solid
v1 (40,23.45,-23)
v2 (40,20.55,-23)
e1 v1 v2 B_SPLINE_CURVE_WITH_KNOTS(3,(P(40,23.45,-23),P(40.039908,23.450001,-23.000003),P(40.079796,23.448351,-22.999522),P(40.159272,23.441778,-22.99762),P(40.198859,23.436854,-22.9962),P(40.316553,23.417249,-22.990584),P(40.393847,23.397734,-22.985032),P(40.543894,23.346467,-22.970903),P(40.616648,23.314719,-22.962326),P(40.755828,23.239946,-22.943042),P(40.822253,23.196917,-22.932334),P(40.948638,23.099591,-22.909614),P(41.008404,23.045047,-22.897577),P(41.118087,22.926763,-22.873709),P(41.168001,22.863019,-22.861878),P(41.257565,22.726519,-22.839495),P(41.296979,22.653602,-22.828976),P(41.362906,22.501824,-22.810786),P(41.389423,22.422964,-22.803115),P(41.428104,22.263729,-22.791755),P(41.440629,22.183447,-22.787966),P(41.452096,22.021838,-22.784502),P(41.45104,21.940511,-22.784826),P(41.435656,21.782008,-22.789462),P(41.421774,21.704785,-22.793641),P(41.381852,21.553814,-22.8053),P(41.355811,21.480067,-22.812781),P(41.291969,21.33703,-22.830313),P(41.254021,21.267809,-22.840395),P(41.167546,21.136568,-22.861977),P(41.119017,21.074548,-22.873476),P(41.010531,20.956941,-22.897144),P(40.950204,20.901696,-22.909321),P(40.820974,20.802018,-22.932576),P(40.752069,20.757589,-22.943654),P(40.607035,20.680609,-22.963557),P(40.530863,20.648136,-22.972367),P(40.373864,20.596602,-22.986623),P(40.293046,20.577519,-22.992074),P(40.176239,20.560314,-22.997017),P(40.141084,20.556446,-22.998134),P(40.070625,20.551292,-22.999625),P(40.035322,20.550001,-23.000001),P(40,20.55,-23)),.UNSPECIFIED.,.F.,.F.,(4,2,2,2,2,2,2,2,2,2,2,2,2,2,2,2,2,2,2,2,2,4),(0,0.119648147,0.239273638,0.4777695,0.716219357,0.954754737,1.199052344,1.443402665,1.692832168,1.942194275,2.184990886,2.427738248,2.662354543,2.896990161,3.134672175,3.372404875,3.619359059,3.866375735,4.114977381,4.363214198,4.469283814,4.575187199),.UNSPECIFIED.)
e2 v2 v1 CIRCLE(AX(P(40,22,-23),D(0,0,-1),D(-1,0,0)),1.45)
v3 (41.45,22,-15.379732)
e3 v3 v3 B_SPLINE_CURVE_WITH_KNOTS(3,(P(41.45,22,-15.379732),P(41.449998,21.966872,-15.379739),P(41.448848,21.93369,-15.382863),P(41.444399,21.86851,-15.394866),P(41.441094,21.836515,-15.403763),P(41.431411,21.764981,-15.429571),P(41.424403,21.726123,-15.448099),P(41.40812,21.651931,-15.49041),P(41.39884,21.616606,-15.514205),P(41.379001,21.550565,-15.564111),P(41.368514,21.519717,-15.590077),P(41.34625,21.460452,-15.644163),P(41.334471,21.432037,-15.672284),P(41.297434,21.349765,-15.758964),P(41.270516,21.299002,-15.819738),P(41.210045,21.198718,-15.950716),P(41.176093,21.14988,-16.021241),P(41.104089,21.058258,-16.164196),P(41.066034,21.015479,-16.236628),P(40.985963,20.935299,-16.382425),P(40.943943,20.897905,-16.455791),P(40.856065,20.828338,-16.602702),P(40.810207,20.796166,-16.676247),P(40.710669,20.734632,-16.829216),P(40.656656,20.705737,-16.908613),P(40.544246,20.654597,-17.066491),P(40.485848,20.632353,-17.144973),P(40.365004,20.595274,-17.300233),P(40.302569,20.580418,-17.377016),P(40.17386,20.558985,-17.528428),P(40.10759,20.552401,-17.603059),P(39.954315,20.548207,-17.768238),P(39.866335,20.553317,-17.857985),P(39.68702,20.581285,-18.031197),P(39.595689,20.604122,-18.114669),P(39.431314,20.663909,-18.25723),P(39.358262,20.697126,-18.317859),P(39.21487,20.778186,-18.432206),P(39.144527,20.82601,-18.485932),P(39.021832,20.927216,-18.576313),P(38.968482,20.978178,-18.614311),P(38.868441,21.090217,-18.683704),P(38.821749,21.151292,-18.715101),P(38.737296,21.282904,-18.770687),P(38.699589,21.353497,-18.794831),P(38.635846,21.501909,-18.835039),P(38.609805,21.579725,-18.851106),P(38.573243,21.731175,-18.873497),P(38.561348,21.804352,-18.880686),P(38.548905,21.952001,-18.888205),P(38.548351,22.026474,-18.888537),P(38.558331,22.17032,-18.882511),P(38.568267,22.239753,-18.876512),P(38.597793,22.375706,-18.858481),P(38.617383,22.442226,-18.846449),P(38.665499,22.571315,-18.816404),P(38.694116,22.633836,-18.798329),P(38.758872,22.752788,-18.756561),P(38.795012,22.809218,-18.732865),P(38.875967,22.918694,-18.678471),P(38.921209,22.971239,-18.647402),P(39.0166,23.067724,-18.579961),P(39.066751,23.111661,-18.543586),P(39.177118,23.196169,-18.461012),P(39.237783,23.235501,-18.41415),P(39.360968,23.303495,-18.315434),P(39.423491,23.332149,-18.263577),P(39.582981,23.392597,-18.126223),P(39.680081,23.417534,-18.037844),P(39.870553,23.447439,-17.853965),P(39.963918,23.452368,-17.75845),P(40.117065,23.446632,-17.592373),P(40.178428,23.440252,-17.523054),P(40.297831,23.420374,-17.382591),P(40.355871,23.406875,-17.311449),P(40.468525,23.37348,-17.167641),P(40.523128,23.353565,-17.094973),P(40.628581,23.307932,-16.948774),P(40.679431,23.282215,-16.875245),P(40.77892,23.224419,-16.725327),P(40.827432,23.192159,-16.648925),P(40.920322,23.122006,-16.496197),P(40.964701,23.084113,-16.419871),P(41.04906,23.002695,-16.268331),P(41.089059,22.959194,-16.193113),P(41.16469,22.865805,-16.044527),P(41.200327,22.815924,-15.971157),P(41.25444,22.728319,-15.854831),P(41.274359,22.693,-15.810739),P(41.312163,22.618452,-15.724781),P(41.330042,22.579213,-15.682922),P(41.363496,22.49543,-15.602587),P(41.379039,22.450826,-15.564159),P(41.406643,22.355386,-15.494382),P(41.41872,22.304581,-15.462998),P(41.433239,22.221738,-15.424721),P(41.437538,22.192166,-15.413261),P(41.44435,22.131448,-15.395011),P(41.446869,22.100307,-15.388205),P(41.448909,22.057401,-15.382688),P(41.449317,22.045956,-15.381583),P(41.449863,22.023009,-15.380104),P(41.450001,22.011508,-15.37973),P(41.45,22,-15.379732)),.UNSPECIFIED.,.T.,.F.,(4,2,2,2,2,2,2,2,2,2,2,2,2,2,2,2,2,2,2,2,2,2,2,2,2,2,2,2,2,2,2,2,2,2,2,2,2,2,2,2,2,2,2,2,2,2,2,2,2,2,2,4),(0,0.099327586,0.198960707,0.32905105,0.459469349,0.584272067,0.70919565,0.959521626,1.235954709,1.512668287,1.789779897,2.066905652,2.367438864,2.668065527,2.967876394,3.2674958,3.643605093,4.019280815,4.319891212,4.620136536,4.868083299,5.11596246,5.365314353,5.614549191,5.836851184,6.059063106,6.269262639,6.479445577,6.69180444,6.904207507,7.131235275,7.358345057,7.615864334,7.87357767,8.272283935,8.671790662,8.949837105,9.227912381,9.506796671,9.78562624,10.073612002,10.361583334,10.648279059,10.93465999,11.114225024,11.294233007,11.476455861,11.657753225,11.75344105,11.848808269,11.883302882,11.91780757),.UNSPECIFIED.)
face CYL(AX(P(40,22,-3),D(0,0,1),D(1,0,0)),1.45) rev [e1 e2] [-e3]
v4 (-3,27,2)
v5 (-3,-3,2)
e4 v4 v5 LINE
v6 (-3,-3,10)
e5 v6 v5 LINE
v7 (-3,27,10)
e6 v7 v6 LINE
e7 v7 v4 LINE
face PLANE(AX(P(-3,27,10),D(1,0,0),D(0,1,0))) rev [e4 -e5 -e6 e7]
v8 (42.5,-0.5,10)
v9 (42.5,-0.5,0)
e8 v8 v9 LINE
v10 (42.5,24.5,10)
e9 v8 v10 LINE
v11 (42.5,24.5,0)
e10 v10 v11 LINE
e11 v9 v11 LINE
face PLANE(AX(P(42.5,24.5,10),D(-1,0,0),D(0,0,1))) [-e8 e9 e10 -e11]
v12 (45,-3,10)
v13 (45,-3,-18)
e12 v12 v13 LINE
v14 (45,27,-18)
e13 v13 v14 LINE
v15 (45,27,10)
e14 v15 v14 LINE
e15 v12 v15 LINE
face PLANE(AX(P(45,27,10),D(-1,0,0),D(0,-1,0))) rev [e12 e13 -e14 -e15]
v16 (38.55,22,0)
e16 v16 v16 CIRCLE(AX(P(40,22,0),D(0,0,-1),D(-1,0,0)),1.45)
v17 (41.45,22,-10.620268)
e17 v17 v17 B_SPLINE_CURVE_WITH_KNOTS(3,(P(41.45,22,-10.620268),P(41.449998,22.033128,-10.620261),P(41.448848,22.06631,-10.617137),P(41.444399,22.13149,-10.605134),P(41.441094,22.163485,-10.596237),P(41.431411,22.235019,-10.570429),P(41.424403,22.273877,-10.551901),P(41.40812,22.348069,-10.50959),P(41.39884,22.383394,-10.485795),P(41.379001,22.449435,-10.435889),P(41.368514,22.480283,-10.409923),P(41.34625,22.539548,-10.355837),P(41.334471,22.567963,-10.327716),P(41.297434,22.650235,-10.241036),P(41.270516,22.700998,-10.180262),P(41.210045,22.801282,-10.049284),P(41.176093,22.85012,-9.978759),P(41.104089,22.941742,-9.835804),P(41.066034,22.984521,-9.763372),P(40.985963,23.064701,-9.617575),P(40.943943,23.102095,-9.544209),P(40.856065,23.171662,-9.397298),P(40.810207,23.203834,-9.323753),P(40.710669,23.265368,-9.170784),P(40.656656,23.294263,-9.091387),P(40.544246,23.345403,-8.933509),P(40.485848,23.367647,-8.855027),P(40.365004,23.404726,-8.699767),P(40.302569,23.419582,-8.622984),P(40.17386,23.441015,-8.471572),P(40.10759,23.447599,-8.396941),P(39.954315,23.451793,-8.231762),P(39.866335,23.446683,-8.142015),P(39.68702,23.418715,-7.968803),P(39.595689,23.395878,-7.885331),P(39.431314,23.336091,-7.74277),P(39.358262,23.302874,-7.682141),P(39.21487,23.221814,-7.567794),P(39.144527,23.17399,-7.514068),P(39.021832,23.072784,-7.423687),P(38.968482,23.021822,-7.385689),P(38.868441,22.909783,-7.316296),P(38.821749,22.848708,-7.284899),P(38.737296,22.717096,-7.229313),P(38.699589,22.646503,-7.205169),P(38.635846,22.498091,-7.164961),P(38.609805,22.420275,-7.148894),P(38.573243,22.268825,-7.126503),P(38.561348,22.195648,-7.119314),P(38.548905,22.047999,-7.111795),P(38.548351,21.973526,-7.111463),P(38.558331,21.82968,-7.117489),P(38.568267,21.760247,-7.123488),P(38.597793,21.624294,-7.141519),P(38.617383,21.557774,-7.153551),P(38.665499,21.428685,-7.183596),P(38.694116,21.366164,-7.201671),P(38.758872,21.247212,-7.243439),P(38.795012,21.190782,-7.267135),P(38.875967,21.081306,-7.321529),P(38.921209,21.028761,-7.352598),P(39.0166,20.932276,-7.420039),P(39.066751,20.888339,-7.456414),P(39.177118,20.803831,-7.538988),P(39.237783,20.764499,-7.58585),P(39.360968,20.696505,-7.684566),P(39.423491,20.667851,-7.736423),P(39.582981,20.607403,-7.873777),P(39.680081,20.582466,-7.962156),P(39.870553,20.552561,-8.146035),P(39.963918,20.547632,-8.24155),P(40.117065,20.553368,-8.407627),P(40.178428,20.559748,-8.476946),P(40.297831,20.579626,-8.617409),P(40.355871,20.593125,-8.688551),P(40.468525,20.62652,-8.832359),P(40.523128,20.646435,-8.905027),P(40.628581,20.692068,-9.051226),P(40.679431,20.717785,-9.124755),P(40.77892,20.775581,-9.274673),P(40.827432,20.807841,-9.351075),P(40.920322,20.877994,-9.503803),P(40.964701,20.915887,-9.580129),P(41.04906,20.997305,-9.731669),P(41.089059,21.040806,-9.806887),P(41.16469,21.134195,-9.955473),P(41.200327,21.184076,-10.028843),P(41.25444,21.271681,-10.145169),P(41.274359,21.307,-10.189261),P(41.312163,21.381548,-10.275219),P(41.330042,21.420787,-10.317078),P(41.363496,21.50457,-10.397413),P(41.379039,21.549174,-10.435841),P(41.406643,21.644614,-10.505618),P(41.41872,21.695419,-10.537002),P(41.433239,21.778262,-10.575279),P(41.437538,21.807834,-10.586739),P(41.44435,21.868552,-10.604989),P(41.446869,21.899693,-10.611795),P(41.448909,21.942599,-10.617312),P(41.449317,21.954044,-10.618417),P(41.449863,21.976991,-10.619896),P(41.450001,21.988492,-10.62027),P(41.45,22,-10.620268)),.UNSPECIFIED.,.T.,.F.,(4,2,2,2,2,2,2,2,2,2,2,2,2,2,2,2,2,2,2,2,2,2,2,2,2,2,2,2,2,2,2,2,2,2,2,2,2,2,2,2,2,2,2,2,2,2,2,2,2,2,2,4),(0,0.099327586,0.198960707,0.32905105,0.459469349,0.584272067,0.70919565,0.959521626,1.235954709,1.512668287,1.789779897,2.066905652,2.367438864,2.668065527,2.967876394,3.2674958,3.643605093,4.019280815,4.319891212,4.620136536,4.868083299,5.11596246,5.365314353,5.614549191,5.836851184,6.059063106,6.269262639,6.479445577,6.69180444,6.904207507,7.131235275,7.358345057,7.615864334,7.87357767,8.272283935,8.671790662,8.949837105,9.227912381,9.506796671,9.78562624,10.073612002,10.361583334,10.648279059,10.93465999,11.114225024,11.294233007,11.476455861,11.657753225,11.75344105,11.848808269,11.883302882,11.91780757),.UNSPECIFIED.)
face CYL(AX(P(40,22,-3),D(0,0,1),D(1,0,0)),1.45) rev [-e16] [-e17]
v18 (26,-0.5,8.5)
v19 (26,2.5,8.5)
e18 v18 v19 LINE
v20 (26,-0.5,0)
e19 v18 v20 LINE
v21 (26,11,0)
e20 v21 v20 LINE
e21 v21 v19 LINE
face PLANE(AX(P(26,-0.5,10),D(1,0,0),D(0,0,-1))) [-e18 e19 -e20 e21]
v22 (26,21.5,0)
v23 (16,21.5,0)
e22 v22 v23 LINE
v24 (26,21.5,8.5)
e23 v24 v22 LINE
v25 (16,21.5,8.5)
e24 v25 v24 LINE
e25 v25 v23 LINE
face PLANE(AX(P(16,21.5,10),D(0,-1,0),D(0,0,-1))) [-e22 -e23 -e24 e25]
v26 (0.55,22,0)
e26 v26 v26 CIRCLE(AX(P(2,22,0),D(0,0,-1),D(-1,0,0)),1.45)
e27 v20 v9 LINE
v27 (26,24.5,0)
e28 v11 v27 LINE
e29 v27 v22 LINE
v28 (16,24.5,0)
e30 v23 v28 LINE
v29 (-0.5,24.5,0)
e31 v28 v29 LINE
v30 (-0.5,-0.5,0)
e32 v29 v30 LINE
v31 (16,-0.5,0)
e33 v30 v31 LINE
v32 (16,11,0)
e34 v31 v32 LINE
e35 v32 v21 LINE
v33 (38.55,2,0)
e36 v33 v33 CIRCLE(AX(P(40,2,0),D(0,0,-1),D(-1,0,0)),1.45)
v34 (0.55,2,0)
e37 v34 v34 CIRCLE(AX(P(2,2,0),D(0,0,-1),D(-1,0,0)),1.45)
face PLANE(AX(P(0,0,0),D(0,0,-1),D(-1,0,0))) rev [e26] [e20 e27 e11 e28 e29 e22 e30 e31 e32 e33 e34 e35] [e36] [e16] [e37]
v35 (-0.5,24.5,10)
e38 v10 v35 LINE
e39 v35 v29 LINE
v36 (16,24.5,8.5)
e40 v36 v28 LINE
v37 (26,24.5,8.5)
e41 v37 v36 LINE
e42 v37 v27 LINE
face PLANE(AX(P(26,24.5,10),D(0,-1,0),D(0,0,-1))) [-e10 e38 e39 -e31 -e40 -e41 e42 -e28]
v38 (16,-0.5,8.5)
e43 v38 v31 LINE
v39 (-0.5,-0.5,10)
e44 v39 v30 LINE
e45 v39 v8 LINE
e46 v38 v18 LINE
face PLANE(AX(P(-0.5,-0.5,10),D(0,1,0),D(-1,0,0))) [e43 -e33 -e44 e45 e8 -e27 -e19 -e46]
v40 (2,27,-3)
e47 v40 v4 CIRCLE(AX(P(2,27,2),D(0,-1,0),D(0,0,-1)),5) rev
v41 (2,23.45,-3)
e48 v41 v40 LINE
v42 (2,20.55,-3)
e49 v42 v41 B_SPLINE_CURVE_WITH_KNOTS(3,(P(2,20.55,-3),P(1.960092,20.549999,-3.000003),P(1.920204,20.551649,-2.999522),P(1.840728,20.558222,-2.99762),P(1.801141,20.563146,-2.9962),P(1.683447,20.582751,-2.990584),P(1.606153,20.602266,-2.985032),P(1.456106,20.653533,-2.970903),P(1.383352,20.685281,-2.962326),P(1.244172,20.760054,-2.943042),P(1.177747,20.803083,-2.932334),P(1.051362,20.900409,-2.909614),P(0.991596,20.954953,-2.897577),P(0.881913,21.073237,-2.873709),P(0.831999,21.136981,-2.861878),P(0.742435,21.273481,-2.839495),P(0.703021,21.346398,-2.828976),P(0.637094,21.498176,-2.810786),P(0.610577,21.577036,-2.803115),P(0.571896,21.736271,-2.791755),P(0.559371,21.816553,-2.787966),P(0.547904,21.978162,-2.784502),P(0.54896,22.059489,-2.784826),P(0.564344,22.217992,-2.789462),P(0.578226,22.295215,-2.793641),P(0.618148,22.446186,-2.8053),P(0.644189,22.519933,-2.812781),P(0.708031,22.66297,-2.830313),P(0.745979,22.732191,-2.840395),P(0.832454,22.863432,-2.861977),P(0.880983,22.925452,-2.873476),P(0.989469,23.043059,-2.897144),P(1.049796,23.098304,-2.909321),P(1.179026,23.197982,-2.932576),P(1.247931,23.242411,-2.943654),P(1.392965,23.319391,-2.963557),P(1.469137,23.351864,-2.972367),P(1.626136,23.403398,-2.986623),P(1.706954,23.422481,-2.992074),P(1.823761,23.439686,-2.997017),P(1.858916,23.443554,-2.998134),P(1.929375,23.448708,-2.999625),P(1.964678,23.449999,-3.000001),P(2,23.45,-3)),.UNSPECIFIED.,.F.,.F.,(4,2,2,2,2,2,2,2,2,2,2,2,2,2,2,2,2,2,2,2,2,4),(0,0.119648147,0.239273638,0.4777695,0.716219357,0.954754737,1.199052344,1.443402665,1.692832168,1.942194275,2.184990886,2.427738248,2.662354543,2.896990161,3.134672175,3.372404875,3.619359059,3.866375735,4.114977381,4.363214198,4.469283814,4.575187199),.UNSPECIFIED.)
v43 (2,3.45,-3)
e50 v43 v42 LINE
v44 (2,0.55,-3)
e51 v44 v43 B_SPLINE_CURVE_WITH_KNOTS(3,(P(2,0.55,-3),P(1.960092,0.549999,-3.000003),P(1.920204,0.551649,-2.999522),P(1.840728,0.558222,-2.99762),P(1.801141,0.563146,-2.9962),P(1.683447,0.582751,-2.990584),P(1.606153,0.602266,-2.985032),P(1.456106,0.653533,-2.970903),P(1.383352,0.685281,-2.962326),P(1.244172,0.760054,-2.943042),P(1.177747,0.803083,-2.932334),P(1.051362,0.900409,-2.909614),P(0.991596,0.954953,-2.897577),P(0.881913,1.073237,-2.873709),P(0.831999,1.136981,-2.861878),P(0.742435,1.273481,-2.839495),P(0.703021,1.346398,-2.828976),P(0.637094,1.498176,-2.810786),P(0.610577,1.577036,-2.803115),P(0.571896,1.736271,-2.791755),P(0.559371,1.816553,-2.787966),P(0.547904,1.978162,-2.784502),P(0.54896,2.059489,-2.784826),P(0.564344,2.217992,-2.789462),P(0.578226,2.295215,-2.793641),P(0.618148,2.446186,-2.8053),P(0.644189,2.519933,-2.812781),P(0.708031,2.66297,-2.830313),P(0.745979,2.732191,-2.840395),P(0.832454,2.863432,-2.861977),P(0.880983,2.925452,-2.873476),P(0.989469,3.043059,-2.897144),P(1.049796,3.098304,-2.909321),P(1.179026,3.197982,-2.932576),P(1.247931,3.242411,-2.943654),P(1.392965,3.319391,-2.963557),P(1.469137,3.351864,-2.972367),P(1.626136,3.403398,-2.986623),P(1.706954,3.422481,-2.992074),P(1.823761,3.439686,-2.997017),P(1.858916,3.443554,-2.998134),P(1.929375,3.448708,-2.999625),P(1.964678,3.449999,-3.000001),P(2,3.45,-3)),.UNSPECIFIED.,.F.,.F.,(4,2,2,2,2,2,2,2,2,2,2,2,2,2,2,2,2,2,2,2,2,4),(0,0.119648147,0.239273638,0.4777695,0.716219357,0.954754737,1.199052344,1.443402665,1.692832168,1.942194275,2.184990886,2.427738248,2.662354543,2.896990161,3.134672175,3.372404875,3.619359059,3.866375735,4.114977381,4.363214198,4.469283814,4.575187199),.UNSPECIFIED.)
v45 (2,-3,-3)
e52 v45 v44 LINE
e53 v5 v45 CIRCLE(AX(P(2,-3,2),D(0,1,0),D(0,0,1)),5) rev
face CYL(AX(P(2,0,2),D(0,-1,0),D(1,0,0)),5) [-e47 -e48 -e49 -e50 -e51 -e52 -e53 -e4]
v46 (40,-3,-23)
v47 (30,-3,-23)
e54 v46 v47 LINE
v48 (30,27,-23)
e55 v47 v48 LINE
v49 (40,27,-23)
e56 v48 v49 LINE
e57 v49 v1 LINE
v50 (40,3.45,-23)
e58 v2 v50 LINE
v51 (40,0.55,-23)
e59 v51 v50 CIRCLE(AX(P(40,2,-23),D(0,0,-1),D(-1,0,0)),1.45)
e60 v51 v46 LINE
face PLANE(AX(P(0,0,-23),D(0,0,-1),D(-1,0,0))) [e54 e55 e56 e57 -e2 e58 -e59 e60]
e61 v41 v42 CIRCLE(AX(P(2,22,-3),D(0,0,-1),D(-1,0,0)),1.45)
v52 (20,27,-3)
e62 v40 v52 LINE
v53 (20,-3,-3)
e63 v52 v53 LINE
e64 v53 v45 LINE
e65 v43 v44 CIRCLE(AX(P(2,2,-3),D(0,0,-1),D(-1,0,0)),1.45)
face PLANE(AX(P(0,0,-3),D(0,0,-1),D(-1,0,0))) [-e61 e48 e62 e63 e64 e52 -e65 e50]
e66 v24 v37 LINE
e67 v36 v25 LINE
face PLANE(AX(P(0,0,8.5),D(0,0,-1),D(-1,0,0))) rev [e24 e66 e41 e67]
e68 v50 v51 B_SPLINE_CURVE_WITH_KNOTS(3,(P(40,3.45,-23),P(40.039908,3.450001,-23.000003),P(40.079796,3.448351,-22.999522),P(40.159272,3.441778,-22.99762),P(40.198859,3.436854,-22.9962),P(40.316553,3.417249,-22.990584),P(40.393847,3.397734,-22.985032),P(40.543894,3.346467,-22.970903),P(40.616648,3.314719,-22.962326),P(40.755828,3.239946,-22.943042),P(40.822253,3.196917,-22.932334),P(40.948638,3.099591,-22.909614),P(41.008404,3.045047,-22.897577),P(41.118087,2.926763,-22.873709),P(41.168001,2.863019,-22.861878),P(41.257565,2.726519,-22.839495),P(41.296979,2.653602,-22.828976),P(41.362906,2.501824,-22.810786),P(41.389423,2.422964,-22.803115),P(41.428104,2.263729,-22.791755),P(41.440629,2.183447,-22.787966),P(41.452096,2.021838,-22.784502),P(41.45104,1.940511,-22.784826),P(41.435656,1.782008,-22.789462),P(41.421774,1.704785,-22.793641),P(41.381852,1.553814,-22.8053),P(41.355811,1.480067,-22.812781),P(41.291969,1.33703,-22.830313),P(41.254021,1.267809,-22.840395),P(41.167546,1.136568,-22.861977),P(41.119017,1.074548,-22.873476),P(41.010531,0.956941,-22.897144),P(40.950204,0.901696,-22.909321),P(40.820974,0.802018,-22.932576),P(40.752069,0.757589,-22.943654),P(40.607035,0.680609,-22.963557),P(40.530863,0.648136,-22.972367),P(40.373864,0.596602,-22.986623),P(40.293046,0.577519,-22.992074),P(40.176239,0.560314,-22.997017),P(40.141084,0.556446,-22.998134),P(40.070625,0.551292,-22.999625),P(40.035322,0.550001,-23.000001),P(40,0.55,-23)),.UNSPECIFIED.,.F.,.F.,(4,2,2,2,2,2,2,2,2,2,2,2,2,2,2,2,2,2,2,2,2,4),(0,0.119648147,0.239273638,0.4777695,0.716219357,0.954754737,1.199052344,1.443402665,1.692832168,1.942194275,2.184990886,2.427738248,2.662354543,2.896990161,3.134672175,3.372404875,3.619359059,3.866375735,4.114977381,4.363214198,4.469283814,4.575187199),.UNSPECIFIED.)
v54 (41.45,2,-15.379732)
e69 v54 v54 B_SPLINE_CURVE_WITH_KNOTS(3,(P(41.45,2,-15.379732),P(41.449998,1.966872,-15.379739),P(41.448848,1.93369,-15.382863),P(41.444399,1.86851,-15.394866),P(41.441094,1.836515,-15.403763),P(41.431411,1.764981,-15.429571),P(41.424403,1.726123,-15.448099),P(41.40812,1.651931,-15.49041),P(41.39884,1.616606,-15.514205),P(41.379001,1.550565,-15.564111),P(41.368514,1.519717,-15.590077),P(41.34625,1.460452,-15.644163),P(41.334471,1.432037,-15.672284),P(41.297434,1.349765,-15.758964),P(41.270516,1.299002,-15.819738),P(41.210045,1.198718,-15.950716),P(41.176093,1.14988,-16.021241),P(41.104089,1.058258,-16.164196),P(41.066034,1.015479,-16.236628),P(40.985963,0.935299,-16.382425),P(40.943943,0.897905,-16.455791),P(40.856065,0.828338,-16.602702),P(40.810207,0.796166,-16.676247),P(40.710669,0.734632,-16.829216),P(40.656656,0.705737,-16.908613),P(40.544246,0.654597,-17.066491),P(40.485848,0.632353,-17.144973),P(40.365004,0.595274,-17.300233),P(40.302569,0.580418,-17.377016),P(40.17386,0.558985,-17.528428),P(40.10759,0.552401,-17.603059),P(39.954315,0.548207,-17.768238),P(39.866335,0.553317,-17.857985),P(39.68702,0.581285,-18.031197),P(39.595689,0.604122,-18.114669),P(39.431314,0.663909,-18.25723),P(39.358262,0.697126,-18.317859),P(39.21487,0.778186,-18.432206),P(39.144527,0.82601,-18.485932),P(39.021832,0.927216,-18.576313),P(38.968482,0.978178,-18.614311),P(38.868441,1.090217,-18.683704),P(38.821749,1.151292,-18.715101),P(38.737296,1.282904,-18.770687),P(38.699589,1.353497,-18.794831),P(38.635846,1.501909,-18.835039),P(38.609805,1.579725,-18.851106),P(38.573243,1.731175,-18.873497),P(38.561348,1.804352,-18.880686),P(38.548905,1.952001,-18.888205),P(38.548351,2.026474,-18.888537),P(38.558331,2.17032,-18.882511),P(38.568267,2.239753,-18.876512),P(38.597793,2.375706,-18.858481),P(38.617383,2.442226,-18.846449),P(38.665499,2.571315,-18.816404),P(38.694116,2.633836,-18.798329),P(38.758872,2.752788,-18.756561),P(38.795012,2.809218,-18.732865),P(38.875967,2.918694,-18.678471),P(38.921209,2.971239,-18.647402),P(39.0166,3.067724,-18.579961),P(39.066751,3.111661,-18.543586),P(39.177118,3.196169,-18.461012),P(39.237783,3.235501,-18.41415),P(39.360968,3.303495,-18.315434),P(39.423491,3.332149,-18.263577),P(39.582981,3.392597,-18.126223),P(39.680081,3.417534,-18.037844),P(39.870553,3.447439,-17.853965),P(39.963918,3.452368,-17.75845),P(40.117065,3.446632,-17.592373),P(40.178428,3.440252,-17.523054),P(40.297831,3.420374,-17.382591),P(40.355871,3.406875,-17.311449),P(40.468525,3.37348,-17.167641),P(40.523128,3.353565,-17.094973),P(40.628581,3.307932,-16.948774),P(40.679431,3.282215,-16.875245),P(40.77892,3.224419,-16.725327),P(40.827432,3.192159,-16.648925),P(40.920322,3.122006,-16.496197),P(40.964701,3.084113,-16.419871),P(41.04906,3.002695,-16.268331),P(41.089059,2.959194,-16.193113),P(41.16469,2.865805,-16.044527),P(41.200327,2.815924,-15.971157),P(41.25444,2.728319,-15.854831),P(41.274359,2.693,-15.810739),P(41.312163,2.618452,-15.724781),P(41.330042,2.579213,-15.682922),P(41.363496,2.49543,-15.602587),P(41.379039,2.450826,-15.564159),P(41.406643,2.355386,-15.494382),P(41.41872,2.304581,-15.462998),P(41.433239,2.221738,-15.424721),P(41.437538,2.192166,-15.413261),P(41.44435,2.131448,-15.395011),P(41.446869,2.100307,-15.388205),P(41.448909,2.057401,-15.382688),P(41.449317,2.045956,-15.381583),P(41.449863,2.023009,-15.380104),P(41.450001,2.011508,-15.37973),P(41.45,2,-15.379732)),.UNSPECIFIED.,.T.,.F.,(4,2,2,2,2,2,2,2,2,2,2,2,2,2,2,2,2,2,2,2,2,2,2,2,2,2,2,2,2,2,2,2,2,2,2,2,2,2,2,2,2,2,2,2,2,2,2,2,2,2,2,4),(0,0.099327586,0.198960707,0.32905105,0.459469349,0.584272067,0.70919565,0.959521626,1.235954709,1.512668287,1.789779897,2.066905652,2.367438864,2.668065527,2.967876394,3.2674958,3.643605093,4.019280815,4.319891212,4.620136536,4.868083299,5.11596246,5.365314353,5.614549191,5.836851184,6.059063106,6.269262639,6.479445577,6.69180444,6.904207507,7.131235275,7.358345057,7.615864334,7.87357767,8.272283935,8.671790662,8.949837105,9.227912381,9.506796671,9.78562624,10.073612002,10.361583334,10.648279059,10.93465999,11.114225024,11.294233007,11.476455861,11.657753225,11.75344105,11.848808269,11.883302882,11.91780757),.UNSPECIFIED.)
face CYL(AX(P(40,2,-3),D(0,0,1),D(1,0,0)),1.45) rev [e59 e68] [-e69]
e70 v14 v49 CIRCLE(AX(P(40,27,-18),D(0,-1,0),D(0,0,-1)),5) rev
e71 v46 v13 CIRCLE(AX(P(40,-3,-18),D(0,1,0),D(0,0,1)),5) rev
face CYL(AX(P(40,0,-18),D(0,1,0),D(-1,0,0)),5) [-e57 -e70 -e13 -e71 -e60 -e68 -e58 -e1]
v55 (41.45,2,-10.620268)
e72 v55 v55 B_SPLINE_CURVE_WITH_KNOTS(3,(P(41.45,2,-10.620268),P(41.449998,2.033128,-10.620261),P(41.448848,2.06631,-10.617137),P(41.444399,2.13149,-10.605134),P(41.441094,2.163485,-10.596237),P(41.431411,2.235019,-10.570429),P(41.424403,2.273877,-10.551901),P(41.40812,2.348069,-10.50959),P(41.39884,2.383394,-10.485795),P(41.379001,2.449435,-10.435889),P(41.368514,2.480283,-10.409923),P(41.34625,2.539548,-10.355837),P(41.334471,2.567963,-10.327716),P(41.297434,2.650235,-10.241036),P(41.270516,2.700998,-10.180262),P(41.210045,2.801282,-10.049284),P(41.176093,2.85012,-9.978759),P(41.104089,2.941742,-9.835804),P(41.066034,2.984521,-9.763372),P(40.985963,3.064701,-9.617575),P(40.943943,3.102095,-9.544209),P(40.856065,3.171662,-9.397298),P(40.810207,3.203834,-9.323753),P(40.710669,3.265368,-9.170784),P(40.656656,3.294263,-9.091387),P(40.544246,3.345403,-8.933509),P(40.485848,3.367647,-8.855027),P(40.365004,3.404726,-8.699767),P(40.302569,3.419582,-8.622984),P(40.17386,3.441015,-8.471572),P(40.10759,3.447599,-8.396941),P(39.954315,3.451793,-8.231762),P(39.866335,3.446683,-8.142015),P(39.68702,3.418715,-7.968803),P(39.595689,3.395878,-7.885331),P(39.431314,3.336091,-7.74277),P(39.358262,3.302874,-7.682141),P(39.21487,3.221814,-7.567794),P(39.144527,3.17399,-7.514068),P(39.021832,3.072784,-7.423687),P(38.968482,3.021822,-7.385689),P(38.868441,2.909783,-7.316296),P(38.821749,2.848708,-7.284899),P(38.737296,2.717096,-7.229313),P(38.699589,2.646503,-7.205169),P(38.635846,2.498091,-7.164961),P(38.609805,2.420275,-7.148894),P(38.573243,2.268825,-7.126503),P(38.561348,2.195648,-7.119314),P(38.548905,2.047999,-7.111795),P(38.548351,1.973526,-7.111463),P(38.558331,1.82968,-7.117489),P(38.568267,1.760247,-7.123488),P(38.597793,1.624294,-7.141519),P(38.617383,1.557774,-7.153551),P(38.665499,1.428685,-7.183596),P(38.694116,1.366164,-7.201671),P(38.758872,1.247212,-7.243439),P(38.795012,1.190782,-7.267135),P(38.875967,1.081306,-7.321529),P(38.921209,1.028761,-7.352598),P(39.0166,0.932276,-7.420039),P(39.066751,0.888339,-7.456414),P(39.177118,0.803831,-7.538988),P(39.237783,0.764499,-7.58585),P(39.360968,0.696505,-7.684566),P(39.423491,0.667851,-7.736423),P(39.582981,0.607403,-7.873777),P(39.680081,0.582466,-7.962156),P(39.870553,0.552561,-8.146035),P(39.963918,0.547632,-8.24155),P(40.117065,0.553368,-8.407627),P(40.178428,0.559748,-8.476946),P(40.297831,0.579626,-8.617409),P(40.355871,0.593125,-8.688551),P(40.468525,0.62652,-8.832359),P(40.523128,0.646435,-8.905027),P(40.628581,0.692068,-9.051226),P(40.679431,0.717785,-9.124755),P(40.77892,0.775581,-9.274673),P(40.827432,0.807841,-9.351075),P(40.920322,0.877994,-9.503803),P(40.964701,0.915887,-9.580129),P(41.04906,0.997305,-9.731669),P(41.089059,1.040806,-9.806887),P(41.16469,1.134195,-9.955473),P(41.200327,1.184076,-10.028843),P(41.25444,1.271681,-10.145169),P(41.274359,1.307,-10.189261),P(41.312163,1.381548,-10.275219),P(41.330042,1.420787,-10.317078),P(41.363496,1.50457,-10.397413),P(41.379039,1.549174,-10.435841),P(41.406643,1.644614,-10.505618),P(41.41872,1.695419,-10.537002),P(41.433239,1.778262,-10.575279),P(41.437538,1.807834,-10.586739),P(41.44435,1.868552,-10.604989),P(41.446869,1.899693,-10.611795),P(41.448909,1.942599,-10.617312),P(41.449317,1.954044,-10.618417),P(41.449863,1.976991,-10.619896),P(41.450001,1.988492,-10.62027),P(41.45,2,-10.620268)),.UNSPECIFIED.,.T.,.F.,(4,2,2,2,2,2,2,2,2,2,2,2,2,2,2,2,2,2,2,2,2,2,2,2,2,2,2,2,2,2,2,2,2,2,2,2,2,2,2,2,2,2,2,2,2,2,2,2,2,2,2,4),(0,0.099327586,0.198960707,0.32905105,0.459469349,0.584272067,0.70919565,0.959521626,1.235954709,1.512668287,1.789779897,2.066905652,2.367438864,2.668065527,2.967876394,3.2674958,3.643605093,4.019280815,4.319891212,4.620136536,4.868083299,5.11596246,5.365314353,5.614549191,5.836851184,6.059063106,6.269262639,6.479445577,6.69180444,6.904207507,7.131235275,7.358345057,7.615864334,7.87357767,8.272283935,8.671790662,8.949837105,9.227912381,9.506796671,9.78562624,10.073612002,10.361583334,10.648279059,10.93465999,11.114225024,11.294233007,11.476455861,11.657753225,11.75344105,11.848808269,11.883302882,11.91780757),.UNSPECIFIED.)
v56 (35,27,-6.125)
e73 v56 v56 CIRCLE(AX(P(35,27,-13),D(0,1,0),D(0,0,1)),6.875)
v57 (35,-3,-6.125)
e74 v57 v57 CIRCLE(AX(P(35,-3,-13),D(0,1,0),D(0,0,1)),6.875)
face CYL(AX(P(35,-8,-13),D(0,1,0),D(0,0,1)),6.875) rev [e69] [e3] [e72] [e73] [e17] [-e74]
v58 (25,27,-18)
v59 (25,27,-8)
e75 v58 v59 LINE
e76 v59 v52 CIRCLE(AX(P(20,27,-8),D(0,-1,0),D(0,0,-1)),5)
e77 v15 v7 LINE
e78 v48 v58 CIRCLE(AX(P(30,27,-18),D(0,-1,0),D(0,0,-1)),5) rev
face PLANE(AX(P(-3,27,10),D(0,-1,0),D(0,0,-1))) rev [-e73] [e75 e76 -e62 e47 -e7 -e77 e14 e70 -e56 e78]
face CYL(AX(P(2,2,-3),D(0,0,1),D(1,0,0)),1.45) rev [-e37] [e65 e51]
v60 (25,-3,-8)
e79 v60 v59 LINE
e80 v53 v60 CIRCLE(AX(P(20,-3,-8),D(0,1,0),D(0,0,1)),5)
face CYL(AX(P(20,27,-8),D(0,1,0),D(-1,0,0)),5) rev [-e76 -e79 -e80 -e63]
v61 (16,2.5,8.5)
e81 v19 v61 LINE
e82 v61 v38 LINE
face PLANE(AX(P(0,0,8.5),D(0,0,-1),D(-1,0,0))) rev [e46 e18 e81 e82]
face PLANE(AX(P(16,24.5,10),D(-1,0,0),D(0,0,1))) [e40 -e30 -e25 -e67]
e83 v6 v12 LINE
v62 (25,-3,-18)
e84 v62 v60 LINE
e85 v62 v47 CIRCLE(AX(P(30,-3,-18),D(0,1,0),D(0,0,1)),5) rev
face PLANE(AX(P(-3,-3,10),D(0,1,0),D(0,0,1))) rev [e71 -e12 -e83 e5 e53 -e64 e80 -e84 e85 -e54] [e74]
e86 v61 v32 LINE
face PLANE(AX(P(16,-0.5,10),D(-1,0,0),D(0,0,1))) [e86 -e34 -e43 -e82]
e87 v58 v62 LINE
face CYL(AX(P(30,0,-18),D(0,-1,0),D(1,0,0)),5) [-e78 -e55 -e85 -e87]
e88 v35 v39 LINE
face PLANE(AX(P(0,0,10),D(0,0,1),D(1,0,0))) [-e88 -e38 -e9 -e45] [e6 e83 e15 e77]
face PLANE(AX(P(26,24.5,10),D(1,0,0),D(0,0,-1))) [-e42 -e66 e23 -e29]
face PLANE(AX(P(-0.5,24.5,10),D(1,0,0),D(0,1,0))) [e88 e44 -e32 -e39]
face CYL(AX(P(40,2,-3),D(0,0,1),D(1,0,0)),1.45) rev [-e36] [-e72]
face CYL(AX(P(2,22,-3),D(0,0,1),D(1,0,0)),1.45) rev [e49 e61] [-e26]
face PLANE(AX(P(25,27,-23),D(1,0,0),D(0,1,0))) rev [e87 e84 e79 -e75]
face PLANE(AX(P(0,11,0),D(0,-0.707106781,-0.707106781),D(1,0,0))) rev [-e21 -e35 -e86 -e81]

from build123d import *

# Parameters (mm, degrees)
SKETCH1_W           = 48
SKETCH1_H           = 30
BOSS_EXTRUDE1_DEPTH = 10
SKETCH2_W           = 10
SKETCH2_H           = 3
CUT_EXTRUDE1_DEPTH  = 1.5
SKETCH3_W           = 48
SKETCH3_H           = 30
SKETCH3_R           = 1.45
BOSS_EXTRUDE2_DEPTH = 3
SKETCH4_W           = 20
SKETCH4_H           = 30
SKETCH4_R           = 1.45
BOSS_EXTRUDE3_DEPTH = 20
SKETCH5_R           = 6.875
CUT_EXTRUDE2_DEPTH  = 35
FILLET1_R           = 5
CHAMFER1_SIZE       = 8.5


# Some blends are built 0.0001 mm under size
with BuildPart() as part:
    # Sketch1 → Boss-Extrude1 (new body)
    with BuildSketch(Plane.XY):
        with Locations((21, 12)):
            Rectangle(SKETCH1_W, SKETCH1_H)
        Polygon((-0.5, 24.5), (16, 24.5), (16, 21.5), (26, 21.5), (26, 24.5), (42.5, 24.5), (42.5, -0.5), (26, -0.5), (26, 2.5), (16, 2.5), (16, -0.5), (-0.5, -0.5), align=None, mode=Mode.SUBTRACT)
    extrude(amount=BOSS_EXTRUDE1_DEPTH)

    # Sketch2 → Cut-Extrude1 (cut)
    with BuildSketch(Plane.XY.offset(10)):
        with Locations((21, 1)):
            Rectangle(SKETCH2_W, SKETCH2_H)
        with Locations((21, 23)):
            Rectangle(SKETCH2_W, SKETCH2_H)
    extrude(amount=-CUT_EXTRUDE1_DEPTH, mode=Mode.SUBTRACT)

    # Sketch3 → Boss-Extrude2 (add)
    with BuildSketch(Plane(origin=(0, 0, 0), x_dir=(-1, 0, 0), z_dir=(0, 0, -1))):
        with Locations((-21, 12)):
            Rectangle(SKETCH3_W, SKETCH3_H)
        with Locations((-40, 22)):
            Circle(SKETCH3_R, mode=Mode.SUBTRACT)
        with Locations((-40, 2)):
            Circle(SKETCH3_R, mode=Mode.SUBTRACT)
        with Locations((-2, 22)):
            Circle(SKETCH3_R, mode=Mode.SUBTRACT)
        with Locations((-2, 2)):
            Circle(SKETCH3_R, mode=Mode.SUBTRACT)
    extrude(amount=BOSS_EXTRUDE2_DEPTH)

    # Sketch4 → Boss-Extrude3 (add)
    with BuildSketch(Plane(origin=(0, 0, -3), x_dir=(-1, 0, 0), z_dir=(0, 0, -1))):
        with Locations((-35, 12)):
            Rectangle(SKETCH4_W, SKETCH4_H)
        with Locations((-40, 22)):
            Circle(SKETCH4_R, mode=Mode.SUBTRACT)
        with Locations((-40, 2)):
            Circle(SKETCH4_R, mode=Mode.SUBTRACT)
    extrude(amount=BOSS_EXTRUDE3_DEPTH)

    # Sketch5 → Cut-Extrude2 (cut)
    with BuildSketch(Plane(origin=(0, 27, 0), x_dir=(1, 0, 0), z_dir=(0, 1, 0))):
        with Locations(Location((35, 13, 0), (0, 0, 270))):
            Circle(SKETCH5_R)
    extrude(amount=-CUT_EXTRUDE2_DEPTH, mode=Mode.SUBTRACT)

    # Fillet1
    # the kernel refuses this fillet: 5 mm, written as the material it adds along each edge
    with BuildSketch(Plane(origin=(25, 27, -3), x_dir=(-1, 0, 0), z_dir=(0, -1, 0))) as fillet1_piece_1:
        with BuildLine():
            CenterArc((FILLET1_R, FILLET1_R), FILLET1_R, 180, 90)
            Line((0, FILLET1_R), (0, 0))
            Line((0, 0), (FILLET1_R, 0))
        make_face()
    extrude(amount=30)
    # the kernel refuses this fillet: 5 mm, written as the material it takes off along each edge
    with BuildSketch(Plane(origin=(45, -15.5, -23), x_dir=(0, 0, 1), z_dir=(0, 1, 0)), Plane(origin=(-3, 39.5, -3), x_dir=(0, 0, 1), z_dir=(0, -1, 0))) as fillet1_2_piece_1:
        with BuildLine():
            CenterArc((FILLET1_R, -FILLET1_R), FILLET1_R, 90, 90)
            Line((0, -FILLET1_R), (0, 0))
            Line((0, 0), (FILLET1_R, 0))
        make_face()
    extrude(amount=55, mode=Mode.SUBTRACT)
    with BuildSketch(Plane(origin=(25, 39.5, -23), x_dir=(1, 0, 0), z_dir=(0, -1, 0))) as fillet1_2_piece_2:
        with BuildLine():
            CenterArc((FILLET1_R, FILLET1_R), FILLET1_R, 180, 90)
            Line((0, FILLET1_R), (0, 0))
            Line((0, 0), (FILLET1_R, 0))
        make_face()
    extrude(amount=55, mode=Mode.SUBTRACT)

    # Chamfer1
    chamfer1_edges = [part.edges().sort_by_distance(p)[0] for p in [
        (21, 2.5, 0),
    ]]
    chamfer(chamfer1_edges, length=CHAMFER1_SIZE - 0.0001)  # a hair under: the kernel refuses the full size


solid = part.part
